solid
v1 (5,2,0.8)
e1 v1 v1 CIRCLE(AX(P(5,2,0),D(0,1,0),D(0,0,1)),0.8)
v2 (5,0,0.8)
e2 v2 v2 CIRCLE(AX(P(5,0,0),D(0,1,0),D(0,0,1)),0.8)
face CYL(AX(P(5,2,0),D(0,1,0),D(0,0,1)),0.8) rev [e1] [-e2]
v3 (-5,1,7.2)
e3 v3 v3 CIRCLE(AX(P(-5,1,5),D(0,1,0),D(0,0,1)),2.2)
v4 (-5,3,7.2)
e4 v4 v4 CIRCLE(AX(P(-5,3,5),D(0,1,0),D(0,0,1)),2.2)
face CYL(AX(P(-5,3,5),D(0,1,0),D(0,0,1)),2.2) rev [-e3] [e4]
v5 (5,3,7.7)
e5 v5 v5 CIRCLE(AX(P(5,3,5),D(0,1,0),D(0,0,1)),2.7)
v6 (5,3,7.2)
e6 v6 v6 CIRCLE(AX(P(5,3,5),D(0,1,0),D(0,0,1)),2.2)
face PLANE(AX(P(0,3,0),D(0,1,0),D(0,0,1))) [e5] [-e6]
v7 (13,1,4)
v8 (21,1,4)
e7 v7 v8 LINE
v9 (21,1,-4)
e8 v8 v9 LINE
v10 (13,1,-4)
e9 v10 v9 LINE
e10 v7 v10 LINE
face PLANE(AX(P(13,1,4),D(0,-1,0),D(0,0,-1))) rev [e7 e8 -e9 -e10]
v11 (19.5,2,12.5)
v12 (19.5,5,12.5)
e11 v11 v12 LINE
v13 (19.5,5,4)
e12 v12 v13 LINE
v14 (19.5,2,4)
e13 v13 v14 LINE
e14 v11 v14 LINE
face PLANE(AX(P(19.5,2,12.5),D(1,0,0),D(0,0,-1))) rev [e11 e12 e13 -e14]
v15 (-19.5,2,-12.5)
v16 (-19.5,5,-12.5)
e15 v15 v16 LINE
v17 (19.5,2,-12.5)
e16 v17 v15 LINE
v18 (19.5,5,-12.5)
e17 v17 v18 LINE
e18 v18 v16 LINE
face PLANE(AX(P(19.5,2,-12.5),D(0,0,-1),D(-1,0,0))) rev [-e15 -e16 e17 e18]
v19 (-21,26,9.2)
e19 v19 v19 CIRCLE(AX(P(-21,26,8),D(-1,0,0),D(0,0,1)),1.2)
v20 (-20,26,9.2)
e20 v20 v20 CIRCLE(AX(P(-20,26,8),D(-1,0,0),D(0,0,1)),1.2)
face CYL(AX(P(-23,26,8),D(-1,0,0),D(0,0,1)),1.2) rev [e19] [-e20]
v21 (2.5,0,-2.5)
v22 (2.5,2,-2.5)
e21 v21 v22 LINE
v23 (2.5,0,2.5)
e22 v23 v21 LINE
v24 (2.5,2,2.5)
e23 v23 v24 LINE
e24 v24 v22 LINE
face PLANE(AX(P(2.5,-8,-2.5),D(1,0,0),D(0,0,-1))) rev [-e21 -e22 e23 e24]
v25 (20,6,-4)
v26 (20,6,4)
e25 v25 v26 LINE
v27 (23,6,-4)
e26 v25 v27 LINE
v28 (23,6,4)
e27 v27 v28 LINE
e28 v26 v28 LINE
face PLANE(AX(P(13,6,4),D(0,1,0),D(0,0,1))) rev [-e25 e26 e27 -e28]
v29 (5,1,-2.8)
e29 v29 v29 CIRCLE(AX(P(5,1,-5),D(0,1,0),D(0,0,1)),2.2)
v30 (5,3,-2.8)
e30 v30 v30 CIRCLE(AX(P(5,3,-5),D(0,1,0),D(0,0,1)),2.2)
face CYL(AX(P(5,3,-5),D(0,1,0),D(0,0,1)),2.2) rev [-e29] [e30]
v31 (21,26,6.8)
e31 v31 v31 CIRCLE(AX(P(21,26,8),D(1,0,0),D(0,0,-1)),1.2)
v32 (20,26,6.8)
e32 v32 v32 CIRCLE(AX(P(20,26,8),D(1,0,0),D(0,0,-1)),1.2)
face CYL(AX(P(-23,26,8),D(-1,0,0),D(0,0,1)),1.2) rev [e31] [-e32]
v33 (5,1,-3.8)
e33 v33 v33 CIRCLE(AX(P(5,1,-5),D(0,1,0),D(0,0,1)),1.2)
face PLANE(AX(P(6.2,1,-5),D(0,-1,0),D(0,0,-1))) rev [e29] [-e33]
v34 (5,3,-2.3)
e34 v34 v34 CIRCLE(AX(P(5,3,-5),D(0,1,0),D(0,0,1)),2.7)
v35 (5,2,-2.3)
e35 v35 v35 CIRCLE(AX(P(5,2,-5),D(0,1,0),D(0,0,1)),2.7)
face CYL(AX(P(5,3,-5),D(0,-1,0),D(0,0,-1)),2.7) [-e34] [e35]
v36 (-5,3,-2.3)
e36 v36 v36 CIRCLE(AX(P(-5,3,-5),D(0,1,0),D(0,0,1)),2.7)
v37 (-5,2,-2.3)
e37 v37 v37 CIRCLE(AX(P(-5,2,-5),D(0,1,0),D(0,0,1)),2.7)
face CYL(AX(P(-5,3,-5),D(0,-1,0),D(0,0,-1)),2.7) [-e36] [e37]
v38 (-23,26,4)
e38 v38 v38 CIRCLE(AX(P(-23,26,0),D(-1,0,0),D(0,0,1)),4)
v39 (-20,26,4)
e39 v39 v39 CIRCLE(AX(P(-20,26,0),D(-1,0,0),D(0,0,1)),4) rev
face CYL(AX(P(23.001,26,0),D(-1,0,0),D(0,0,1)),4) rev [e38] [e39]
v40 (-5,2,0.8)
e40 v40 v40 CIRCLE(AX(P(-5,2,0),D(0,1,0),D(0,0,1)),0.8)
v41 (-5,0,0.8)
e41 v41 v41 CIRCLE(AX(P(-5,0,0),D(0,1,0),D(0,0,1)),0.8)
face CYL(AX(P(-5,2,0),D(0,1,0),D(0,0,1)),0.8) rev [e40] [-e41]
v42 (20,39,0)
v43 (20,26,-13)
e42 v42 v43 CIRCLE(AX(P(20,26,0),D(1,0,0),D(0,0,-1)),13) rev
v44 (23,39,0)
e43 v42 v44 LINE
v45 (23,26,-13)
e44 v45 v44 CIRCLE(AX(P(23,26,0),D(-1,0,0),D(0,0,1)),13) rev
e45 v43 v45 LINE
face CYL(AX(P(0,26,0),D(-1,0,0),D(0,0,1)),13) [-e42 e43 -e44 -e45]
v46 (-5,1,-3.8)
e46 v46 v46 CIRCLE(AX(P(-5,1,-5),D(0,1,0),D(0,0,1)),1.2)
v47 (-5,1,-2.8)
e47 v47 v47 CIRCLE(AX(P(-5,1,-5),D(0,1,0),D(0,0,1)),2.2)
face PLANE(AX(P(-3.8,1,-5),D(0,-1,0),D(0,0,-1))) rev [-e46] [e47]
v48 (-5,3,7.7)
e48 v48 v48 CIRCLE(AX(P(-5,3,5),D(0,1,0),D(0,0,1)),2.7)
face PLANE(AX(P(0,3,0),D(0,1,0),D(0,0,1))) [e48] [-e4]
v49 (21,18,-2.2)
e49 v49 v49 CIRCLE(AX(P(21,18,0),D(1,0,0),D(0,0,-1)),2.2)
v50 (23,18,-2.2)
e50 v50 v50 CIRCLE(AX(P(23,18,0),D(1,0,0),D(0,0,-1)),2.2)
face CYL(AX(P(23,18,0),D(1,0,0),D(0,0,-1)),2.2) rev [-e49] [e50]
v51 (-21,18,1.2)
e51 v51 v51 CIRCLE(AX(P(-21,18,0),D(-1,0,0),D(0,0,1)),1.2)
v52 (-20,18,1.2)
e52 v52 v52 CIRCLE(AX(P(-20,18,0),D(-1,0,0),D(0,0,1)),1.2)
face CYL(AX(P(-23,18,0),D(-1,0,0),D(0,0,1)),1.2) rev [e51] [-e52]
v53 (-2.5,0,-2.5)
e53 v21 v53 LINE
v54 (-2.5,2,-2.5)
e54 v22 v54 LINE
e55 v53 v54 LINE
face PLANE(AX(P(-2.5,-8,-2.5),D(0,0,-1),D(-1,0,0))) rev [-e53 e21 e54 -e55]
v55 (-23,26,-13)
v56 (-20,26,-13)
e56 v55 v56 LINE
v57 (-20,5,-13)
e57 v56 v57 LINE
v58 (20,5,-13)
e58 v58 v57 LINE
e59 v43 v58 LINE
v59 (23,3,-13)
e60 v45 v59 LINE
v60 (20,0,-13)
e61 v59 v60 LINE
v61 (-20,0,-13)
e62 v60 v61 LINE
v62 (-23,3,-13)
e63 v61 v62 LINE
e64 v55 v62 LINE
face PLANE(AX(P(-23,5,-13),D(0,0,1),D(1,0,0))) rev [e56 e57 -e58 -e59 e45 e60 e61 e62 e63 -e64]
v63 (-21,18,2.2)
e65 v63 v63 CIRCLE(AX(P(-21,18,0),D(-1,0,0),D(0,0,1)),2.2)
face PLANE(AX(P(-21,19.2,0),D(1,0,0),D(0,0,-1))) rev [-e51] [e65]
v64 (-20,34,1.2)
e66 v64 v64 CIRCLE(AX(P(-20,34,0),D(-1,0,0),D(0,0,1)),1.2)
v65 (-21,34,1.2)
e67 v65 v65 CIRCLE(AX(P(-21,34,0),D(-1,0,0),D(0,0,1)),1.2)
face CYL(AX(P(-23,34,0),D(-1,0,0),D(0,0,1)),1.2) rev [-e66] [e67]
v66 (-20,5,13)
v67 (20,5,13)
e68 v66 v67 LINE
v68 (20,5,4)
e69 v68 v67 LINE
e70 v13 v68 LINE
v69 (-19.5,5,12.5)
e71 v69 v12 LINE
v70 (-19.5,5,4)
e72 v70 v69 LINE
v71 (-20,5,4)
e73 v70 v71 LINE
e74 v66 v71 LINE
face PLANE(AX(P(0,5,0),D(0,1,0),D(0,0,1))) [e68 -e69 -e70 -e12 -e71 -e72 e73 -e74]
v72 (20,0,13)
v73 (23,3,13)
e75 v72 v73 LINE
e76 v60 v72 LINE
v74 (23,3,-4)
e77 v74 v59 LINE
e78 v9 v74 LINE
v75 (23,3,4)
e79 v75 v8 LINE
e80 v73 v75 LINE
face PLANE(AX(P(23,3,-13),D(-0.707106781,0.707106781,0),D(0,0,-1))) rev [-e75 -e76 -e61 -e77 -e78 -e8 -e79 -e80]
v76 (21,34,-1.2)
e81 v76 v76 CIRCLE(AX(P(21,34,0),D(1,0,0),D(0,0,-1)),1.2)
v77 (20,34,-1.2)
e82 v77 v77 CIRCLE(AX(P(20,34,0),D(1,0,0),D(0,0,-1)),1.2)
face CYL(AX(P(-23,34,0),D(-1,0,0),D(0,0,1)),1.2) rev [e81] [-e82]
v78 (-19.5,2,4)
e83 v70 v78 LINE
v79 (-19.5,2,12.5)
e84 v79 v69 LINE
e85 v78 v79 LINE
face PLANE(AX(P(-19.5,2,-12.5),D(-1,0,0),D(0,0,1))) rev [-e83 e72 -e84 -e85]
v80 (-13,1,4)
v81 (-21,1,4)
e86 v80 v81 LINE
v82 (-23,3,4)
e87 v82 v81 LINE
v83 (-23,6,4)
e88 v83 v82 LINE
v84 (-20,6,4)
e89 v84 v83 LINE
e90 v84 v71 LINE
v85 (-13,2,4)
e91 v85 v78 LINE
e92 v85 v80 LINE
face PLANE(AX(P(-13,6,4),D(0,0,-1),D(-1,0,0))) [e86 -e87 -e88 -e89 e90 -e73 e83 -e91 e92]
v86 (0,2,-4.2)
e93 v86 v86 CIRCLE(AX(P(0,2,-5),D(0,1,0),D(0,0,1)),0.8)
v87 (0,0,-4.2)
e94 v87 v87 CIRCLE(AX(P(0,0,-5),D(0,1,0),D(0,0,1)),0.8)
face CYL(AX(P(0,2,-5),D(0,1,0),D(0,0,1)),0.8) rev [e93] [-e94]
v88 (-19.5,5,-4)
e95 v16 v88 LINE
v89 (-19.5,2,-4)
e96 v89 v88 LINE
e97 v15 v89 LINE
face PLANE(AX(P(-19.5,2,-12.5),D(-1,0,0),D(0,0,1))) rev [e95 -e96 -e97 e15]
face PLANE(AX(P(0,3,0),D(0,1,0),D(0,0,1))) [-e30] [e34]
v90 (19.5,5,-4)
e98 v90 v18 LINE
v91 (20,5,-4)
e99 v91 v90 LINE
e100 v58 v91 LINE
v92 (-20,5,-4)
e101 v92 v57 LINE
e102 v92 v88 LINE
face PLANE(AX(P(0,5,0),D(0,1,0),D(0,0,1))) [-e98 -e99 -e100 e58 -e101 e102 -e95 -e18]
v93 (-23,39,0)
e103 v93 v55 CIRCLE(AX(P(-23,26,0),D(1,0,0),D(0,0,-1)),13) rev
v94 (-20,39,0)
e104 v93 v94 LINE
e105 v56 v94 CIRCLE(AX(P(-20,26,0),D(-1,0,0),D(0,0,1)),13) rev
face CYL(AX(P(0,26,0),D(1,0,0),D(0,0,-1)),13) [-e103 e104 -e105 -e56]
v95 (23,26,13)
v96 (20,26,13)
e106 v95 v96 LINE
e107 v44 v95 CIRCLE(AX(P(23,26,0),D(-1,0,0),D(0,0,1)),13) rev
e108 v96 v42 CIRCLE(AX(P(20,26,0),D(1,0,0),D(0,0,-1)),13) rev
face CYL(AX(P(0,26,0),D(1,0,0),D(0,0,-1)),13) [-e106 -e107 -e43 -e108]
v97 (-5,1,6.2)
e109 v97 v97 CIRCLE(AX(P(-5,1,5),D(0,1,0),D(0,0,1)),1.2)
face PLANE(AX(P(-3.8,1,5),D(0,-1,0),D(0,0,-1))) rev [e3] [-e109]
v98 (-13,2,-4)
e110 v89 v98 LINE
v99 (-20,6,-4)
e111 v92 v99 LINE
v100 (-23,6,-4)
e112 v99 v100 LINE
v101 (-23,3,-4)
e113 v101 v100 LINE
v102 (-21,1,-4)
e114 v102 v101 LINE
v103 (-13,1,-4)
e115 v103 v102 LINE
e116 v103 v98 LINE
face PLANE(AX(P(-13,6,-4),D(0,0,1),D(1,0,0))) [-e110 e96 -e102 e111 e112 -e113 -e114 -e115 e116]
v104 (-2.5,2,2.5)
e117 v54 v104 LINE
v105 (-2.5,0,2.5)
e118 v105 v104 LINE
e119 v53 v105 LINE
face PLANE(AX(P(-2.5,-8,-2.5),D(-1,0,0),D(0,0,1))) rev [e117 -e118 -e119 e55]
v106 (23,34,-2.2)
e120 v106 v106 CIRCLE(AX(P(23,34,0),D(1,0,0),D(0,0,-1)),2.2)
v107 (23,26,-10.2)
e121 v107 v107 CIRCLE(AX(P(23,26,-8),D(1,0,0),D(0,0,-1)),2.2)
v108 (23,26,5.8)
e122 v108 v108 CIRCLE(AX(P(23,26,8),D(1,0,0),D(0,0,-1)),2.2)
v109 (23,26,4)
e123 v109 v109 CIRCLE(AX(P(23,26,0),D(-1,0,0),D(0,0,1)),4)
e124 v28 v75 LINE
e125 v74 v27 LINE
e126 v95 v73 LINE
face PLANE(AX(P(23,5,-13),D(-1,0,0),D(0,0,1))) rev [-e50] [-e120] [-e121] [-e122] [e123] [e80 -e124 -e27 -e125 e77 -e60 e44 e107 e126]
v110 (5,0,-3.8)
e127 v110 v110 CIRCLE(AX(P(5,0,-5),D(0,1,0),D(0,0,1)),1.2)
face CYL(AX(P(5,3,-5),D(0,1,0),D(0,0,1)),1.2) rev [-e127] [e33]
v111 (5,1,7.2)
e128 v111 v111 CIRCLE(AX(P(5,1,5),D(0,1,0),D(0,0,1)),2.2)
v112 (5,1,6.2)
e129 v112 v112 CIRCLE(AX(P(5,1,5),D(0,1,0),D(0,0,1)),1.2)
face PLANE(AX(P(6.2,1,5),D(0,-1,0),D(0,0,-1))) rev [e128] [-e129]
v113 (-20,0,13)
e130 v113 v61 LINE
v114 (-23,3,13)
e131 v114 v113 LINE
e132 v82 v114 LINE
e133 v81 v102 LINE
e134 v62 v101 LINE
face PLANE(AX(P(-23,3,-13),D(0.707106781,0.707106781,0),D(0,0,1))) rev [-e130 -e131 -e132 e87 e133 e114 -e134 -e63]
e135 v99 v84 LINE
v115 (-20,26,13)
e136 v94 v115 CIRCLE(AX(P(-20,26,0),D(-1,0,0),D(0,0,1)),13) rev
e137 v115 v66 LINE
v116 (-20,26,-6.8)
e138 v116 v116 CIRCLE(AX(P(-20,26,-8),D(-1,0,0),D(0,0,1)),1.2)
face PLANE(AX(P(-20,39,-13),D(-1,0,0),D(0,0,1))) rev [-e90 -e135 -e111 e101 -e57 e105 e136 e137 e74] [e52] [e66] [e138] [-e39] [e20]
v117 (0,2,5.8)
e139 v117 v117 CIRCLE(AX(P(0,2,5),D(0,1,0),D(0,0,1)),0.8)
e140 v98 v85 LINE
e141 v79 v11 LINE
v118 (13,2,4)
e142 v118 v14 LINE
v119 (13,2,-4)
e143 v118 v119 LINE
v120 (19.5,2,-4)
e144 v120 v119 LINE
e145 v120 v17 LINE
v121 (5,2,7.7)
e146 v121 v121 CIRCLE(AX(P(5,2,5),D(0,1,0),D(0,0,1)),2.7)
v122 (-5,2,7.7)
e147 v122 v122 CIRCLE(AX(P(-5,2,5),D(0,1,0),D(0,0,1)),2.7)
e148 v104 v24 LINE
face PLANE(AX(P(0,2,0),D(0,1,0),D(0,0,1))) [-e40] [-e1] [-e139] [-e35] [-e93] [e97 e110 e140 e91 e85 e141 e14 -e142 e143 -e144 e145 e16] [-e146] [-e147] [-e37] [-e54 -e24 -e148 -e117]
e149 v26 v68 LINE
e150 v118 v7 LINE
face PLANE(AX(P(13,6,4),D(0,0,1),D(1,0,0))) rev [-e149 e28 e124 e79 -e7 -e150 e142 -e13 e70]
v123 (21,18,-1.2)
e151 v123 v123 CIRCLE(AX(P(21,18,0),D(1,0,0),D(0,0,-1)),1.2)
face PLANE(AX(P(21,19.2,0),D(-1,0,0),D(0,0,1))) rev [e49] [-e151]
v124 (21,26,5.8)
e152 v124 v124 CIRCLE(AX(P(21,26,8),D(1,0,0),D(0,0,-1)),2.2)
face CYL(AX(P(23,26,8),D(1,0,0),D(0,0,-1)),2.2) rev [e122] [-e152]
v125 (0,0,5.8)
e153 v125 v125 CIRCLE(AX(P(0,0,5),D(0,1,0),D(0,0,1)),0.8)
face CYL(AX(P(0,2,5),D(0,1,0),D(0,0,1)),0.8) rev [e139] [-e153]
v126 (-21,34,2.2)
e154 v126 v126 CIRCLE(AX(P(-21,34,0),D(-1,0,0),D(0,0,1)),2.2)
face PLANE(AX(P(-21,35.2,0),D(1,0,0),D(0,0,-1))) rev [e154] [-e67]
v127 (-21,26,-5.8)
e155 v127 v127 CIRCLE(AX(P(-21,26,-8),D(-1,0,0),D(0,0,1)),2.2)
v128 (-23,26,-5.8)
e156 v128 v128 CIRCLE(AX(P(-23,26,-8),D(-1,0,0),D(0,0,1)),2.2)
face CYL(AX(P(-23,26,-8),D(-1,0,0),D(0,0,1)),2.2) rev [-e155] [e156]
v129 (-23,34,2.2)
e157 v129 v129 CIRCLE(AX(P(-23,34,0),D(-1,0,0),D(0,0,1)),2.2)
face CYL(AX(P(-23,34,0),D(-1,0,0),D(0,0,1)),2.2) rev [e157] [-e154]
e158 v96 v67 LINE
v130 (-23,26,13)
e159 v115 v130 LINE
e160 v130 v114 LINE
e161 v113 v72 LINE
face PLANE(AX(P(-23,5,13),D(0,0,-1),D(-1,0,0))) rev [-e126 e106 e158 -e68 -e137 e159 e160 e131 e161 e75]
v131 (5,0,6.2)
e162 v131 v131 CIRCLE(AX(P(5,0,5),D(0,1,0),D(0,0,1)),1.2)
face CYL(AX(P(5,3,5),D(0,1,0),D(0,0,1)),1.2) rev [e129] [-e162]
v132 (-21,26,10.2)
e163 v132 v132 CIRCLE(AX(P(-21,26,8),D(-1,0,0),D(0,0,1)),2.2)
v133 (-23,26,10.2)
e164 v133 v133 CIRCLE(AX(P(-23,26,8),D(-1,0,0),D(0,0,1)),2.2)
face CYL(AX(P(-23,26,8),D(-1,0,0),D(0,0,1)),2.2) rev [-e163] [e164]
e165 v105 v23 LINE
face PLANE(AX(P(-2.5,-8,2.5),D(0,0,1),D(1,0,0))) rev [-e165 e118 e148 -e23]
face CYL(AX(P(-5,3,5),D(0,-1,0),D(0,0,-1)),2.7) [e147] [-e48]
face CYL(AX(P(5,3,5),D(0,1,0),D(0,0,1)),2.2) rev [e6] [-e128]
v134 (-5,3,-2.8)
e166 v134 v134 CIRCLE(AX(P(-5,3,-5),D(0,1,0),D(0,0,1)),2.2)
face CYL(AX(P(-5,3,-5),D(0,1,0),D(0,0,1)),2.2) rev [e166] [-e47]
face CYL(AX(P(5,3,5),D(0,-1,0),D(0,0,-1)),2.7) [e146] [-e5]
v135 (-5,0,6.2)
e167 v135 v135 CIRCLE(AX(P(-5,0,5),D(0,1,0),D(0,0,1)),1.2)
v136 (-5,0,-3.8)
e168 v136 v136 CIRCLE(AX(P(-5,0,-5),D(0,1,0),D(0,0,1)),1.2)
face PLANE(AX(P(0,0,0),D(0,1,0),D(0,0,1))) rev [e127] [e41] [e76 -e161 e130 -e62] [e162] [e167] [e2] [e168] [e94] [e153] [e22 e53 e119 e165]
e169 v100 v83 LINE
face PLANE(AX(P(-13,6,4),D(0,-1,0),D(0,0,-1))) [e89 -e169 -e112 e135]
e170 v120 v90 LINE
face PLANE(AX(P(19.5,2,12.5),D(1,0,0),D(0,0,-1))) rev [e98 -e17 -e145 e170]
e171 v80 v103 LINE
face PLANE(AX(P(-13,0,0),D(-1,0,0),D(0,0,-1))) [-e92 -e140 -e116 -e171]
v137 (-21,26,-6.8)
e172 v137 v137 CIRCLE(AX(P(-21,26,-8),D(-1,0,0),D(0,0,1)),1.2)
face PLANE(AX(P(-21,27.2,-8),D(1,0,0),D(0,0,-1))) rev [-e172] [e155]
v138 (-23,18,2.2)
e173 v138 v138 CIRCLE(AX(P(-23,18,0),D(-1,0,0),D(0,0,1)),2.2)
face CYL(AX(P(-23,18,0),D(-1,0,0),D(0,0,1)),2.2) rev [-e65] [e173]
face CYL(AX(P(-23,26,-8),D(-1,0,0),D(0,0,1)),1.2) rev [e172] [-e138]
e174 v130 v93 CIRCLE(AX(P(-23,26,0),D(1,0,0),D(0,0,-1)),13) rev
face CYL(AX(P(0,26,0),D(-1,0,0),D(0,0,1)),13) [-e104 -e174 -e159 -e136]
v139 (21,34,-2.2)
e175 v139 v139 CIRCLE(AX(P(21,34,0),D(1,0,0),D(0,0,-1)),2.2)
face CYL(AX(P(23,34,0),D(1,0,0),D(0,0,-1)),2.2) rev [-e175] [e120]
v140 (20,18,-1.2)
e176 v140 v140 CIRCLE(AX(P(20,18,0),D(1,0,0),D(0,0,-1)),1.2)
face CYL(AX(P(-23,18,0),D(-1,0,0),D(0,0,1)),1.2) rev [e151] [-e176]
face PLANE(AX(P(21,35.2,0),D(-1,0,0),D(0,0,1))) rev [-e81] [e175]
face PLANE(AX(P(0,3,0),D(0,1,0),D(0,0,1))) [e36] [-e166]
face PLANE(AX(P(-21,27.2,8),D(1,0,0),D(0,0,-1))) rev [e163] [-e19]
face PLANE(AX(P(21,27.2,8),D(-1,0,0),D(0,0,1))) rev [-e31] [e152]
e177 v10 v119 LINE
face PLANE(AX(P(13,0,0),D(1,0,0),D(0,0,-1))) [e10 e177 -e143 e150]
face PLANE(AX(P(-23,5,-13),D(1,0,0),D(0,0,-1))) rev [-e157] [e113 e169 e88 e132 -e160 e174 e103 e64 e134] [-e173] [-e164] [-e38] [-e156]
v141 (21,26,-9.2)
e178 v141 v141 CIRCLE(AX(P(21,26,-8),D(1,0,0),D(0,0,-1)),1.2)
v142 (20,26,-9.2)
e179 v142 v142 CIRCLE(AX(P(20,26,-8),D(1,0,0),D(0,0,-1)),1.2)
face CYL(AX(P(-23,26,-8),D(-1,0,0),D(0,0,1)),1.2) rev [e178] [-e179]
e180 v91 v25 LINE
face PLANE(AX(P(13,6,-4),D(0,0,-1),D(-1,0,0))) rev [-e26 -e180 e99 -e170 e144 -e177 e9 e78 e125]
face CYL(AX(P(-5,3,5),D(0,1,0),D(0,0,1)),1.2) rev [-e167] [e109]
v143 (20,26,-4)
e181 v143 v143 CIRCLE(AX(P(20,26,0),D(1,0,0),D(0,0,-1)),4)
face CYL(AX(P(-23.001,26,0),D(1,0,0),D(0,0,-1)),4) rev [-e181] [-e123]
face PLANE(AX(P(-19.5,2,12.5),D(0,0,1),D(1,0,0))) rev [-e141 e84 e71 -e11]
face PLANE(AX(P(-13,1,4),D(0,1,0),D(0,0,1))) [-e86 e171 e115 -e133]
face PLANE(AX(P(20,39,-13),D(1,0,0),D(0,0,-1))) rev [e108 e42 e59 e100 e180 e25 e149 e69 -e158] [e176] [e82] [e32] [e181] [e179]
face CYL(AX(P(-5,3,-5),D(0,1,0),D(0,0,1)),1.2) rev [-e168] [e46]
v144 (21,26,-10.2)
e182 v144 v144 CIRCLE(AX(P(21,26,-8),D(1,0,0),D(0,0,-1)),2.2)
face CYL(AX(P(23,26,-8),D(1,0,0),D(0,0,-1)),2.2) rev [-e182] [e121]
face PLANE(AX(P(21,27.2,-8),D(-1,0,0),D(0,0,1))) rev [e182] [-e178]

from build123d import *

# Parameters (mm, degrees)
SKETCH_1_W                   = 46
SKETCH_1_H                   = 26
EXTRUDE_1_DEPTH              = 5
SKETCH_2_W                   = 3
SKETCH_2_H                   = 26
EXTRUDE_2_DEPTH              = 34
FILLET_1_R                   = 13
CUT_EXTRUDE_1_REACH          = 63.693
SKETCH_3_R                   = 4
HOLE_WIZARD_M2_1_D           = 2.4
HOLE_WIZARD_M2_1_CBORE_D     = 4.4
HOLE_WIZARD_M2_1_CBORE_DEPTH = 2
SKETCH_6_W                   = 39
SKETCH_6_H                   = 25
CUT_EXTRUDE_3_DEPTH          = 3
CHAMFER_1_SIZE               = 3
SKETCH_7_W                   = 8
SKETCH_7_H                   = 5
CUT_EXTRUDE_4_DEPTH          = 10
SKETCH_8_W                   = 5
SKETCH_8_H                   = 5
CUT_EXTRUDE_5_DEPTH          = 10
SKETCH_9_R                   = 2.7
EXTRUDE_7_DEPTH              = 1
HOLE_WIZARD_M2_2_D           = 2.4
HOLE_WIZARD_M2_2_CBORE_D     = 4.4
HOLE_WIZARD_M2_2_CBORE_DEPTH = 2
M2X0_4_1_D                   = 1.6


with BuildPart() as part:
    # 草图1 → 凸台-拉伸1 (new body)
    with BuildSketch(Plane(origin=(0, 0, 0), x_dir=(1, 0, 0), z_dir=(0, 1, 0))):
        Rectangle(SKETCH_1_W, SKETCH_1_H)
    extrude(amount=EXTRUDE_1_DEPTH)

    # 草图2 → 凸台-拉伸2 (add)
    with BuildSketch(Plane(origin=(0, 5, 0), x_dir=(1, 0, 0), z_dir=(0, 1, 0))):
        with Locations((-21.5, 0)):
            Rectangle(SKETCH_2_W, SKETCH_2_H)
        with Locations((21.5, 0)):
            Rectangle(SKETCH_2_W, SKETCH_2_H)
    extrude(amount=EXTRUDE_2_DEPTH)

    # 圆角1
    fillet_1_edges = [part.edges().sort_by_distance(p)[0] for p in [
        (21.5, 39, -13),
        (-21.5, 39, -13),
        (21.5, 39, 13),
        (-21.5, 39, 13),
    ]]
    fillet(fillet_1_edges, radius=FILLET_1_R - 0.0001)  # a hair under: the kernel refuses the full size

    # 草图3 → 切除-拉伸1 (cut, up to next)
    with BuildSketch(Plane.ZY.offset(23), mode=Mode.PRIVATE) as cut_extrude_1_sk1:
        with Locations((0, 26)):
            Circle(SKETCH_3_R)
    cut_extrude_1_tool1 = extrude(cut_extrude_1_sk1.sketch, amount=-CUT_EXTRUDE_1_REACH, mode=Mode.PRIVATE) & part.part
    cut_extrude_1 = cut_extrude_1_tool1.solids().sort_by_distance((-23, 26, 0))[0]
    add(cut_extrude_1, mode=Mode.SUBTRACT)

    # M2 凹头盖螺钉的柱形沉头孔1 (through all)
    with Locations(Plane(origin=(-23, 26, -8), x_dir=(0, 0, -1), z_dir=(-1, 0, 0))):
        with Locations((0, 0), (-8, -8), (-16, 0), (-8, 8)):
            hole_wizard_m2_1 = CounterBoreHole(HOLE_WIZARD_M2_1_D / 2, HOLE_WIZARD_M2_1_CBORE_D / 2, HOLE_WIZARD_M2_1_CBORE_DEPTH)

    # 镜向1: 切除-拉伸1, M2 凹头盖螺钉的柱形沉头孔1 across plane
    add(cut_extrude_1.mirror(Plane(origin=(0, 0, 0), x_dir=(0, 0, 1), z_dir=(1, 0, 0))), mode=Mode.SUBTRACT)
    add(hole_wizard_m2_1.mirror(Plane(origin=(0, 0, 0), x_dir=(0, 0, 1), z_dir=(1, 0, 0))), mode=Mode.SUBTRACT)

    # 草图6 → 切除-拉伸3 (cut)
    with BuildSketch(Plane(origin=(0, 5, 0), x_dir=(1, 0, 0), z_dir=(0, 1, 0))):
        Rectangle(SKETCH_6_W, SKETCH_6_H)
    extrude(amount=-CUT_EXTRUDE_3_DEPTH, mode=Mode.SUBTRACT)

    # 倒角1
    chamfer_1_edges = [part.edges().sort_by_distance(p)[0] for p in [
        (-23, 0, 0),
        (23, 0, 0),
    ]]
    chamfer(chamfer_1_edges, length=CHAMFER_1_SIZE)

    # 草图7 → 切除-拉伸4 (cut)
    with BuildSketch(Plane(origin=(23, 0, 0), x_dir=(0, 0, -1), z_dir=(1, 0, 0))):
        with Locations((0, 3.5)):
            Rectangle(SKETCH_7_W, SKETCH_7_H)
    cut_extrude_4 = extrude(amount=-CUT_EXTRUDE_4_DEPTH, mode=Mode.SUBTRACT)

    # 镜向2: 切除-拉伸4 across plane
    add(cut_extrude_4.mirror(Plane(origin=(0, 0, 0), x_dir=(0, 0, 1), z_dir=(1, 0, 0))), mode=Mode.SUBTRACT)

    # 草图8 → 切除-拉伸5 (cut)
    with BuildSketch(Plane(origin=(0, 2, 0), x_dir=(1, 0, 0), z_dir=(0, 1, 0))):
        Rectangle(SKETCH_8_W, SKETCH_8_H)
    extrude(amount=-CUT_EXTRUDE_5_DEPTH, mode=Mode.SUBTRACT)

    # 草图9 → 凸台-拉伸7 (add)
    with BuildSketch(Plane(origin=(0, 2, 0), x_dir=(1, 0, 0), z_dir=(0, 1, 0))):
        with Locations(Location((-5, 5, 0), (0, 0, 270))):
            Circle(SKETCH_9_R)
        with Locations(Location((5, 5, 0), (0, 0, 270))):
            Circle(SKETCH_9_R)
        with Locations(Location((5, -5, 0), (0, 0, 270))):
            Circle(SKETCH_9_R)
        with Locations(Location((-5, -5, 0), (0, 0, 270))):
            Circle(SKETCH_9_R)
    extrude(amount=EXTRUDE_7_DEPTH)

    # M2 凹头盖螺钉的柱形沉头孔2 (through all)
    with Locations(Plane(origin=(-5, 3, 5), x_dir=(0, 0, 1), z_dir=(0, 1, 0))):
        with Locations((0, 0), (0, 10), (-10, 10), (-10, 0)):
            CounterBoreHole(HOLE_WIZARD_M2_2_D / 2, HOLE_WIZARD_M2_2_CBORE_D / 2, HOLE_WIZARD_M2_2_CBORE_DEPTH)

    # M2x0.4 螺纹孔1 (through all)
    with Locations(Plane(origin=(-5, 2, 0), x_dir=(0, 0, 1), z_dir=(0, 1, 0))):
        with Locations((0, 0), (-5, 5), (0, 10), (5, 5)):
            Hole(M2X0_4_1_D / 2)


solid = part.part
